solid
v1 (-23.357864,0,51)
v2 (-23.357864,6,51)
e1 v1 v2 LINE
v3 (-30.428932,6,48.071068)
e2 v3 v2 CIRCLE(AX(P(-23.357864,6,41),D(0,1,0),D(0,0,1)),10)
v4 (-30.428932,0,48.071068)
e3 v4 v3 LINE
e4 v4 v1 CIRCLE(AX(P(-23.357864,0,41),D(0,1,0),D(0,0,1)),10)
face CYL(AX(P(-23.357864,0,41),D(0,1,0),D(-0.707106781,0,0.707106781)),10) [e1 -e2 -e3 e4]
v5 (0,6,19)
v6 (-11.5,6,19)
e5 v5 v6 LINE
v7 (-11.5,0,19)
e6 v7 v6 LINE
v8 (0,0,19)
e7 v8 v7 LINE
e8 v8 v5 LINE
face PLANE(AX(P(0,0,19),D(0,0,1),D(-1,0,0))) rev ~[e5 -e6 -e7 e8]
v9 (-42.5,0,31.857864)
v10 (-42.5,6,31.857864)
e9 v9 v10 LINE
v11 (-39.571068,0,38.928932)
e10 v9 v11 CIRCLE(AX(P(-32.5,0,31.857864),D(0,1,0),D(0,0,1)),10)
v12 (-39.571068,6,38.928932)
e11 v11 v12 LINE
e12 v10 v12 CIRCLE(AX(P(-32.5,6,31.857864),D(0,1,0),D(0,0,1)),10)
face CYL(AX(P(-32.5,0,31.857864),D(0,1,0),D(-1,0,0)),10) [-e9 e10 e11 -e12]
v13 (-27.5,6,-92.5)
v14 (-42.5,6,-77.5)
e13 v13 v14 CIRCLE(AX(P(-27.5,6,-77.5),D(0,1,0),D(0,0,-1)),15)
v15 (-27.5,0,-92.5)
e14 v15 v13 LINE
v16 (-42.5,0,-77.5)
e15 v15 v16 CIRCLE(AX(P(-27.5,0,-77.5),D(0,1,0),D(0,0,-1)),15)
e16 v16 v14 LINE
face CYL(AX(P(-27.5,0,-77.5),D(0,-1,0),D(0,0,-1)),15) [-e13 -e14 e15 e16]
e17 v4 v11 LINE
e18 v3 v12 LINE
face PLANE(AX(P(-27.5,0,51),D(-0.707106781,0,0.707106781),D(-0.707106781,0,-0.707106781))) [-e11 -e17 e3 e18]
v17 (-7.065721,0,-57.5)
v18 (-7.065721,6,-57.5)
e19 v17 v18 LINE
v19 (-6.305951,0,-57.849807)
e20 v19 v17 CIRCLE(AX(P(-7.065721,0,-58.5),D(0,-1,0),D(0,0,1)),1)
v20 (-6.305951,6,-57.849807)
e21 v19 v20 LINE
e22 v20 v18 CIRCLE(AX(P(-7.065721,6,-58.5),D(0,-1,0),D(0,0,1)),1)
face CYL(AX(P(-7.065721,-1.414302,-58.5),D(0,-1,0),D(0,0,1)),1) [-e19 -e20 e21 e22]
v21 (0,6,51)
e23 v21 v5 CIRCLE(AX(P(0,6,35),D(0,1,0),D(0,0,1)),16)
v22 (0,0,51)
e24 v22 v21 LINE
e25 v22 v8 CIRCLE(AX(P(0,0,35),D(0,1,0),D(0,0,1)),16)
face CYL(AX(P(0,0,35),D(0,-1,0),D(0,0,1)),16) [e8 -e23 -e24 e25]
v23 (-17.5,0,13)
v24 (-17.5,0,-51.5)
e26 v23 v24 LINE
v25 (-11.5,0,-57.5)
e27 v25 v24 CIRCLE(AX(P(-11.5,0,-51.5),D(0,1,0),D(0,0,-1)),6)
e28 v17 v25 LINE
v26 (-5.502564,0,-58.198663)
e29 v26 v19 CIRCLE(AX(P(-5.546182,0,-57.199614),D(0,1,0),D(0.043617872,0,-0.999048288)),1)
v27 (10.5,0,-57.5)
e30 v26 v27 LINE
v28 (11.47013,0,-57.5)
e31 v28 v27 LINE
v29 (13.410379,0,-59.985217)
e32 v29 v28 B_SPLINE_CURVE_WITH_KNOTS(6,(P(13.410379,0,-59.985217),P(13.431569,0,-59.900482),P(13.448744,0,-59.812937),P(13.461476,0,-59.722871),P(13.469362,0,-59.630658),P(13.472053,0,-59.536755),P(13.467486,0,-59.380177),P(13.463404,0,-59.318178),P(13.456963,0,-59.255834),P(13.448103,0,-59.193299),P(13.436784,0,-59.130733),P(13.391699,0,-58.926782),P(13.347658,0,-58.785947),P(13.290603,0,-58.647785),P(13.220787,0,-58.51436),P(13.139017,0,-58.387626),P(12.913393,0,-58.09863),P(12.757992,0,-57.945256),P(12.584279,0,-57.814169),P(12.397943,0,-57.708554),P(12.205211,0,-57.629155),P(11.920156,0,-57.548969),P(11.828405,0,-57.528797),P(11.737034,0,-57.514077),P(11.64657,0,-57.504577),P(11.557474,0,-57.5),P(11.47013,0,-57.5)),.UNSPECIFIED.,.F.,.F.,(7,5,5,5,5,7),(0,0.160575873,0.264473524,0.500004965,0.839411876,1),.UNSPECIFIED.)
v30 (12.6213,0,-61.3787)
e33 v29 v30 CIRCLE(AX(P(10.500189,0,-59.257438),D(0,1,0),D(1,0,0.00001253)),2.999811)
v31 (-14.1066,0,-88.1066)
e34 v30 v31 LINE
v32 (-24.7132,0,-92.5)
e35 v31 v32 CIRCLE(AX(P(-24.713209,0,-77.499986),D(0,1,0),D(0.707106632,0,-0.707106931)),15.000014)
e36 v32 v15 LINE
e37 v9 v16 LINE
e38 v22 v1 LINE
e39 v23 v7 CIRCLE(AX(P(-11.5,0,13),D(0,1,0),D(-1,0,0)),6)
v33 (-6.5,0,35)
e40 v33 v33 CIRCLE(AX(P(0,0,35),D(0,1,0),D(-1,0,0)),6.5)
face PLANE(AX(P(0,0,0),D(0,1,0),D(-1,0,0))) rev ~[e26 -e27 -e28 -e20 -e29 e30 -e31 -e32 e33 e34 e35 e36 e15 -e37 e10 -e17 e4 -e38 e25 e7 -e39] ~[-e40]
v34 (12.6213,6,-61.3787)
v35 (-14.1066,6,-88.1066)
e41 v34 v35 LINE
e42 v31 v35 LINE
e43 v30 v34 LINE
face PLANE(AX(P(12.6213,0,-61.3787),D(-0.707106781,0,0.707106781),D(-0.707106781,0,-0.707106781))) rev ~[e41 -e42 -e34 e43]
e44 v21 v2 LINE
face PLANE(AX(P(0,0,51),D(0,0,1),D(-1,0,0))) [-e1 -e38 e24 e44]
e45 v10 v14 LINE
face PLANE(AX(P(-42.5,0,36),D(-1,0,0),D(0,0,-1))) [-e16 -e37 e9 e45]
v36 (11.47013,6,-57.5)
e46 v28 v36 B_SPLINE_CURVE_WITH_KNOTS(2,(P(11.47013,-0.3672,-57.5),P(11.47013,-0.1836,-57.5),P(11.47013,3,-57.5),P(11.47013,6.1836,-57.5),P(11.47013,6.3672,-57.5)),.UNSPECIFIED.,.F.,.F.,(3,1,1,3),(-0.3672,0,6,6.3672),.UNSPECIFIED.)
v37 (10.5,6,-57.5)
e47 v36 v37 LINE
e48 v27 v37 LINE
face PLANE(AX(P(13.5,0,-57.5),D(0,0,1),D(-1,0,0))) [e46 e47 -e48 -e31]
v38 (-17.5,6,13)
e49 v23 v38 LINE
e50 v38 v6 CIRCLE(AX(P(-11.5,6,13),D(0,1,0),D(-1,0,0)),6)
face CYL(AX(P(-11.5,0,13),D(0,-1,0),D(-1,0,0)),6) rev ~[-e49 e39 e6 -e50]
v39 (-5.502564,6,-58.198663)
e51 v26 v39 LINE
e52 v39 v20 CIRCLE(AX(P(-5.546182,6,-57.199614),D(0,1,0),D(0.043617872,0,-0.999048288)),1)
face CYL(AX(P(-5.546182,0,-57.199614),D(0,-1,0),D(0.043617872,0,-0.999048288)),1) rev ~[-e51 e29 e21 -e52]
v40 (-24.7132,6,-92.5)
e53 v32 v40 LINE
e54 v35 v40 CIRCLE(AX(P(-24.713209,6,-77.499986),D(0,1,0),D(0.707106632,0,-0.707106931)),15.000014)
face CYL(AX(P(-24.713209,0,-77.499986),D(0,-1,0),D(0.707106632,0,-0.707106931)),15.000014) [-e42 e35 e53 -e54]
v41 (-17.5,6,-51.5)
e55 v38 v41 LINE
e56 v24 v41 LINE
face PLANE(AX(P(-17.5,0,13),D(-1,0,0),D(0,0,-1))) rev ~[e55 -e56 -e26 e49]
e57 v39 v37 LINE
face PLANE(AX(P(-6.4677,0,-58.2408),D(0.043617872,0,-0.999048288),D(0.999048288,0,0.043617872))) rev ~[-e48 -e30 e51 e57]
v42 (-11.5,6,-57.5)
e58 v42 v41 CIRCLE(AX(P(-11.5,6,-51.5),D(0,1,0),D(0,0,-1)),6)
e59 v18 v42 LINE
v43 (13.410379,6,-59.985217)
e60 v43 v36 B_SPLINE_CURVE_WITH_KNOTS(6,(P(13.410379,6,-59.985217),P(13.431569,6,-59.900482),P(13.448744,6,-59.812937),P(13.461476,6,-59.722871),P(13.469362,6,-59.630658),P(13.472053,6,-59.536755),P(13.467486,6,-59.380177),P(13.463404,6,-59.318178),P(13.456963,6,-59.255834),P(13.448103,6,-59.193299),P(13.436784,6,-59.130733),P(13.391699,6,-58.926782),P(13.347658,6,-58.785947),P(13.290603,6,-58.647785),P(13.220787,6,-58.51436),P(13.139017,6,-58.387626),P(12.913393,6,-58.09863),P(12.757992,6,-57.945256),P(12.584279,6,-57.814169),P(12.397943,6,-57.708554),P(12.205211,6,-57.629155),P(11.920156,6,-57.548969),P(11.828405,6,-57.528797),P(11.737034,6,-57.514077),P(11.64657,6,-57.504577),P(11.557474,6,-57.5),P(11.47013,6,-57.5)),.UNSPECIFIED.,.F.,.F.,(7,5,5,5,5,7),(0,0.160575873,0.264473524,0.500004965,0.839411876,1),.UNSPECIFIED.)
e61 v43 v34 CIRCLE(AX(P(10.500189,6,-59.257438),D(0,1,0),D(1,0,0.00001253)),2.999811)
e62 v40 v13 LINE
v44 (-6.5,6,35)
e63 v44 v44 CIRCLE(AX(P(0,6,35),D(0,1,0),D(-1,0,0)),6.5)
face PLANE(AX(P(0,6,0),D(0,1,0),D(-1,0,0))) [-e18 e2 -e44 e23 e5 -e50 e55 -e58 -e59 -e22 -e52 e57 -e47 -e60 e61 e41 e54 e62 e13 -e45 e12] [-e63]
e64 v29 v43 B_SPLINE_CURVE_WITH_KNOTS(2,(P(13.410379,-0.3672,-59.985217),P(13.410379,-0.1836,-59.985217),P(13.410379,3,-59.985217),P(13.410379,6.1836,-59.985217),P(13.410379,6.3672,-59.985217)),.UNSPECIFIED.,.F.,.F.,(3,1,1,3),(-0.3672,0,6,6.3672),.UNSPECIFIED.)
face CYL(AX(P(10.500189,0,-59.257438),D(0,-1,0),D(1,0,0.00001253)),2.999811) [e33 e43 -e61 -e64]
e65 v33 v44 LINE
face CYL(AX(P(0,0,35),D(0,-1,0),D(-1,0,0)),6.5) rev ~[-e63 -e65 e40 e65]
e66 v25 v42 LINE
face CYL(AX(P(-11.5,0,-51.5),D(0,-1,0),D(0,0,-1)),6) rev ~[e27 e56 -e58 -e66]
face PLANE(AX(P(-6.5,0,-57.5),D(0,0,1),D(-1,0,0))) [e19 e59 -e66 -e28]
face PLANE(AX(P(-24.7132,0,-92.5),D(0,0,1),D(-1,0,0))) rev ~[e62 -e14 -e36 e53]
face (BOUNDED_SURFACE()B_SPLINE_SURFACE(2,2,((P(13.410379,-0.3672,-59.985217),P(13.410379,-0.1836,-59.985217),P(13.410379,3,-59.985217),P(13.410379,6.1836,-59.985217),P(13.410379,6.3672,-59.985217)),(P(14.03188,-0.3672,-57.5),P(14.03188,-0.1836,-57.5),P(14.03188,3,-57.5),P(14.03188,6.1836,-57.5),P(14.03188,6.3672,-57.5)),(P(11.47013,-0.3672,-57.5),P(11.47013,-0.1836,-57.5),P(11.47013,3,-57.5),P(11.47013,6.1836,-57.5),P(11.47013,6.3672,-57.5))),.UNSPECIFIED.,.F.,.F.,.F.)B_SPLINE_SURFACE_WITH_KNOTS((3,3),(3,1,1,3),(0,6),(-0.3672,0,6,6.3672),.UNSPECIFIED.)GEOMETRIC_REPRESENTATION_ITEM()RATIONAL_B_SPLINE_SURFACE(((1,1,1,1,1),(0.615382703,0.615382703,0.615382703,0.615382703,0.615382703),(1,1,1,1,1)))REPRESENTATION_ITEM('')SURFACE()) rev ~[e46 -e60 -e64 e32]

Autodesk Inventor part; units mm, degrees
ref_plane "YZ Plane" through (0, 0, 0) normal (1, 0, 0) x (0, 1, 0)
ref_plane "XZ Plane" through (0, 0, 0) normal (0, 1, 0) x (-1, 0, 0)
ref_plane "XY Plane" through (0, 0, 0) normal (0, 0, 1) x (1, 0, 0)
sketch "Náčrt2" plane through (0, 0, 0) normal (0, 1, 0) x (-1, 0, 0)
  line L0 (11.5, 17.5) -> (-11.5, 17.5) construction
  line L1 (-17.5, 11.5) -> (-17.5, -11.5) construction
  line L2 (-11.5, -17.5) -> (11.5, -17.5) construction
  line L3 (17.5, -11.5) -> (17.5, 11.5) construction
  line L4 (42.5, 36) -> (42.5, -77.5)
  line L5 (9, -22.5) -> (-14, -22.5) construction
  line L6 (-20, -28.5) -> (-20, -51.5) construction
  line L7 (-14, -57.5) -> (9, -57.5) construction
  line L8 (15, -51.5) -> (15, -28.5) construction
  arc A0 (15, -28.5) -> (9, -22.5) centre (9, -28.5) ccw construction
  arc A1 (9, -57.5) -> (15, -51.5) centre (9, -51.5) ccw construction
  arc A2 (-20, -51.5) -> (-14, -57.5) centre (-14, -51.5) ccw construction
  arc A3 (-14, -22.5) -> (-20, -28.5) centre (-14, -28.5) ccw construction
  line L9 (-45.6938, -20) -> (9, -20) construction
  arc A4 (17.5, -28.5) -> (9, -20) centre (9, -28.5) ccw construction
  line L10 (17.5, -28.5) -> (17.5, -51.5) construction
  line L11 (17.5, -51.5) -> (15, -51.5) construction
  line L12 (-14, -22.5) -> (-45.6938, -22.5) construction
  line L13 (-45.6938, -22.5) -> (-45.6938, -20) construction
  arc A5 (17.5, 11.5) -> (11.5, 17.5) centre (11.5, 11.5) ccw construction
  arc A6 (11.5, -17.5) -> (17.5, -11.5) centre (11.5, -11.5) ccw construction
  arc A7 (-17.5, -11.5) -> (-11.5, -17.5) centre (-11.5, -11.5) ccw construction
  arc A8 (-11.5, 17.5) -> (-17.5, 11.5) centre (-11.5, 11.5) ccw construction
  line L14 (-11.5, -20) -> (11.5, -20) construction
  line L15 (-20, 73.4113) -> (-20, -11.5) construction
  arc A9 (-20, -11.5) -> (-11.5, -20) centre (-11.5, -11.5) ccw construction
  line L16 (-17.5, 11.5) -> (-17.5, 73.4113) construction
  line L17 (-17.5, 73.4113) -> (-20, 73.4113) construction
  line L18 (11.5, -20) -> (11.5, -17.5) construction
  line L19 (17.5, 17.5) -> (-17.5, 17.5) construction
  line L20 (-17.5, 17.5) -> (-17.5, 52.5) construction
  line L21 (-17.5, 52.5) -> (17.5, 52.5) construction
  line L22 (17.5, 52.5) -> (17.5, 17.5) construction
  circle A10 centre (0, 35) radius 6.5
  arc A11 (0, 51) -> (0, 19) centre (0, 35) ccw
  line L23 (0, 51) -> (27.5, 51)
  line L24 (0, 19) -> (11.5, 19)
  line L25 (27.5, 51) -> (42.5, 36)
  arc A12 (17.5, 13) -> (11.5, 19) centre (11.5, 13) ccw
  line L26 (17.5, 13) -> (17.5, -51.5)
  line L27 (-13.5, -57.5) -> (-13.5, -59.2574)
  line L28 (-12.6213, -61.3787) -> (14.1066, -88.1066)
  line L29 (24.7132, -92.5) -> (27.5, -92.5)
  arc A13 (27.5, -92.5) -> (42.5, -77.5) centre (27.5, -77.5) ccw
  arc A14 (14.1066, -88.1066) -> (24.7132, -92.5) centre (24.7132, -77.5) ccw
  arc A15 (-13.5, -59.2574) -> (-12.6213, -61.3787) centre (-10.5, -59.2574) ccw
  line L30 (17.5, -51.5) -> (17.5, -51.5)
  line L31 (6.4677, -58.2408) -> (-10.5, -57.5)
  line L32 (-13.5, -57.5) -> (-10.5, -57.5)
  line L33 (6.4677, -58.2408) -> (6.5, -57.5)
  line L34 (6.5, -57.5) -> (11.5, -57.5)
  arc A16 (11.5, -57.5) -> (17.5, -51.5) centre (11.5, -51.5) ccw
  point P0 (0, 0)
  point P1 (17.5, 0)
  point P2 (0, 17.5)
  point P3 (42.5, 51)
  point P4 (17.5, 35)
  point P5 (0, 52.5)
  point P6 (-13.5, -60.5)
  dimension "d34" = 35
  dimension "d35" = 6
  dimension "d36" = 5
  dimension "d37" = 2.5
  dimension "d38" = 2.5
  dimension "d39" = 6
  dimension "d40" = 2.5
  dimension "d43" = 25
  dimension "d46" = 13
  dimension "d47" = 32
  dimension "d48" = 15
  dimension "d49" = 15
  dimension "d50" = 6
  dimension "d51" = 35
  dimension "d55" = 3
  dimension "d56" = 15
  dimension "d57" = 15
  dimension "d58" = 3
  dimension "d60" = 35
  dimension "d61" = 3
  dimension "d62" = 2.5
  dimension "d63" = 35
  dimension "d64" = 45
  dimension "d66" = 31
  dimension "d69" = 6
  dimension "d72" = 2.5
extrude "Vysunutí1" add sketch "Náčrt2" along normal blind 6
fillet "Zaoblení3" radius 2 1 edges at (13.5, 3, -57.5)
fillet "Zaoblení4" radius 10 2 edges at (-27.5, 3, 51) (-42.5, 3, 36)
fillet "Zaoblení5" radius 1 2 edges at (-6.5, 3, -57.5) (-6.4677, 3, -58.2408)
equation "\"d49\" = d48"
equation "\"PoloměrOhybu\" = Tloušťka"
equation "\"ŠířkaVýštipu\" = Tloušťka"
equation "\"HloubkaVýštipu\" = 0.5 * Tloušťka"
equation "\"VelikostRohovéhoVýštipu\" = 4 * Tloušťka"
equation "\"MinimálníZbytek\" = 2 * Tloušťka"
equation "\"PřechodovýPoloměr\" = PoloměrOhybu"
equation "\"VelikostJacobihoPoloměru\" = PoloměrOhybu"
equation "\"VelikostMezery\" = Tloušťka"
equation "\"Tloušťka\" = 6"
properties part number "DD_KVD_002_07" material "Nerezová ocel"
